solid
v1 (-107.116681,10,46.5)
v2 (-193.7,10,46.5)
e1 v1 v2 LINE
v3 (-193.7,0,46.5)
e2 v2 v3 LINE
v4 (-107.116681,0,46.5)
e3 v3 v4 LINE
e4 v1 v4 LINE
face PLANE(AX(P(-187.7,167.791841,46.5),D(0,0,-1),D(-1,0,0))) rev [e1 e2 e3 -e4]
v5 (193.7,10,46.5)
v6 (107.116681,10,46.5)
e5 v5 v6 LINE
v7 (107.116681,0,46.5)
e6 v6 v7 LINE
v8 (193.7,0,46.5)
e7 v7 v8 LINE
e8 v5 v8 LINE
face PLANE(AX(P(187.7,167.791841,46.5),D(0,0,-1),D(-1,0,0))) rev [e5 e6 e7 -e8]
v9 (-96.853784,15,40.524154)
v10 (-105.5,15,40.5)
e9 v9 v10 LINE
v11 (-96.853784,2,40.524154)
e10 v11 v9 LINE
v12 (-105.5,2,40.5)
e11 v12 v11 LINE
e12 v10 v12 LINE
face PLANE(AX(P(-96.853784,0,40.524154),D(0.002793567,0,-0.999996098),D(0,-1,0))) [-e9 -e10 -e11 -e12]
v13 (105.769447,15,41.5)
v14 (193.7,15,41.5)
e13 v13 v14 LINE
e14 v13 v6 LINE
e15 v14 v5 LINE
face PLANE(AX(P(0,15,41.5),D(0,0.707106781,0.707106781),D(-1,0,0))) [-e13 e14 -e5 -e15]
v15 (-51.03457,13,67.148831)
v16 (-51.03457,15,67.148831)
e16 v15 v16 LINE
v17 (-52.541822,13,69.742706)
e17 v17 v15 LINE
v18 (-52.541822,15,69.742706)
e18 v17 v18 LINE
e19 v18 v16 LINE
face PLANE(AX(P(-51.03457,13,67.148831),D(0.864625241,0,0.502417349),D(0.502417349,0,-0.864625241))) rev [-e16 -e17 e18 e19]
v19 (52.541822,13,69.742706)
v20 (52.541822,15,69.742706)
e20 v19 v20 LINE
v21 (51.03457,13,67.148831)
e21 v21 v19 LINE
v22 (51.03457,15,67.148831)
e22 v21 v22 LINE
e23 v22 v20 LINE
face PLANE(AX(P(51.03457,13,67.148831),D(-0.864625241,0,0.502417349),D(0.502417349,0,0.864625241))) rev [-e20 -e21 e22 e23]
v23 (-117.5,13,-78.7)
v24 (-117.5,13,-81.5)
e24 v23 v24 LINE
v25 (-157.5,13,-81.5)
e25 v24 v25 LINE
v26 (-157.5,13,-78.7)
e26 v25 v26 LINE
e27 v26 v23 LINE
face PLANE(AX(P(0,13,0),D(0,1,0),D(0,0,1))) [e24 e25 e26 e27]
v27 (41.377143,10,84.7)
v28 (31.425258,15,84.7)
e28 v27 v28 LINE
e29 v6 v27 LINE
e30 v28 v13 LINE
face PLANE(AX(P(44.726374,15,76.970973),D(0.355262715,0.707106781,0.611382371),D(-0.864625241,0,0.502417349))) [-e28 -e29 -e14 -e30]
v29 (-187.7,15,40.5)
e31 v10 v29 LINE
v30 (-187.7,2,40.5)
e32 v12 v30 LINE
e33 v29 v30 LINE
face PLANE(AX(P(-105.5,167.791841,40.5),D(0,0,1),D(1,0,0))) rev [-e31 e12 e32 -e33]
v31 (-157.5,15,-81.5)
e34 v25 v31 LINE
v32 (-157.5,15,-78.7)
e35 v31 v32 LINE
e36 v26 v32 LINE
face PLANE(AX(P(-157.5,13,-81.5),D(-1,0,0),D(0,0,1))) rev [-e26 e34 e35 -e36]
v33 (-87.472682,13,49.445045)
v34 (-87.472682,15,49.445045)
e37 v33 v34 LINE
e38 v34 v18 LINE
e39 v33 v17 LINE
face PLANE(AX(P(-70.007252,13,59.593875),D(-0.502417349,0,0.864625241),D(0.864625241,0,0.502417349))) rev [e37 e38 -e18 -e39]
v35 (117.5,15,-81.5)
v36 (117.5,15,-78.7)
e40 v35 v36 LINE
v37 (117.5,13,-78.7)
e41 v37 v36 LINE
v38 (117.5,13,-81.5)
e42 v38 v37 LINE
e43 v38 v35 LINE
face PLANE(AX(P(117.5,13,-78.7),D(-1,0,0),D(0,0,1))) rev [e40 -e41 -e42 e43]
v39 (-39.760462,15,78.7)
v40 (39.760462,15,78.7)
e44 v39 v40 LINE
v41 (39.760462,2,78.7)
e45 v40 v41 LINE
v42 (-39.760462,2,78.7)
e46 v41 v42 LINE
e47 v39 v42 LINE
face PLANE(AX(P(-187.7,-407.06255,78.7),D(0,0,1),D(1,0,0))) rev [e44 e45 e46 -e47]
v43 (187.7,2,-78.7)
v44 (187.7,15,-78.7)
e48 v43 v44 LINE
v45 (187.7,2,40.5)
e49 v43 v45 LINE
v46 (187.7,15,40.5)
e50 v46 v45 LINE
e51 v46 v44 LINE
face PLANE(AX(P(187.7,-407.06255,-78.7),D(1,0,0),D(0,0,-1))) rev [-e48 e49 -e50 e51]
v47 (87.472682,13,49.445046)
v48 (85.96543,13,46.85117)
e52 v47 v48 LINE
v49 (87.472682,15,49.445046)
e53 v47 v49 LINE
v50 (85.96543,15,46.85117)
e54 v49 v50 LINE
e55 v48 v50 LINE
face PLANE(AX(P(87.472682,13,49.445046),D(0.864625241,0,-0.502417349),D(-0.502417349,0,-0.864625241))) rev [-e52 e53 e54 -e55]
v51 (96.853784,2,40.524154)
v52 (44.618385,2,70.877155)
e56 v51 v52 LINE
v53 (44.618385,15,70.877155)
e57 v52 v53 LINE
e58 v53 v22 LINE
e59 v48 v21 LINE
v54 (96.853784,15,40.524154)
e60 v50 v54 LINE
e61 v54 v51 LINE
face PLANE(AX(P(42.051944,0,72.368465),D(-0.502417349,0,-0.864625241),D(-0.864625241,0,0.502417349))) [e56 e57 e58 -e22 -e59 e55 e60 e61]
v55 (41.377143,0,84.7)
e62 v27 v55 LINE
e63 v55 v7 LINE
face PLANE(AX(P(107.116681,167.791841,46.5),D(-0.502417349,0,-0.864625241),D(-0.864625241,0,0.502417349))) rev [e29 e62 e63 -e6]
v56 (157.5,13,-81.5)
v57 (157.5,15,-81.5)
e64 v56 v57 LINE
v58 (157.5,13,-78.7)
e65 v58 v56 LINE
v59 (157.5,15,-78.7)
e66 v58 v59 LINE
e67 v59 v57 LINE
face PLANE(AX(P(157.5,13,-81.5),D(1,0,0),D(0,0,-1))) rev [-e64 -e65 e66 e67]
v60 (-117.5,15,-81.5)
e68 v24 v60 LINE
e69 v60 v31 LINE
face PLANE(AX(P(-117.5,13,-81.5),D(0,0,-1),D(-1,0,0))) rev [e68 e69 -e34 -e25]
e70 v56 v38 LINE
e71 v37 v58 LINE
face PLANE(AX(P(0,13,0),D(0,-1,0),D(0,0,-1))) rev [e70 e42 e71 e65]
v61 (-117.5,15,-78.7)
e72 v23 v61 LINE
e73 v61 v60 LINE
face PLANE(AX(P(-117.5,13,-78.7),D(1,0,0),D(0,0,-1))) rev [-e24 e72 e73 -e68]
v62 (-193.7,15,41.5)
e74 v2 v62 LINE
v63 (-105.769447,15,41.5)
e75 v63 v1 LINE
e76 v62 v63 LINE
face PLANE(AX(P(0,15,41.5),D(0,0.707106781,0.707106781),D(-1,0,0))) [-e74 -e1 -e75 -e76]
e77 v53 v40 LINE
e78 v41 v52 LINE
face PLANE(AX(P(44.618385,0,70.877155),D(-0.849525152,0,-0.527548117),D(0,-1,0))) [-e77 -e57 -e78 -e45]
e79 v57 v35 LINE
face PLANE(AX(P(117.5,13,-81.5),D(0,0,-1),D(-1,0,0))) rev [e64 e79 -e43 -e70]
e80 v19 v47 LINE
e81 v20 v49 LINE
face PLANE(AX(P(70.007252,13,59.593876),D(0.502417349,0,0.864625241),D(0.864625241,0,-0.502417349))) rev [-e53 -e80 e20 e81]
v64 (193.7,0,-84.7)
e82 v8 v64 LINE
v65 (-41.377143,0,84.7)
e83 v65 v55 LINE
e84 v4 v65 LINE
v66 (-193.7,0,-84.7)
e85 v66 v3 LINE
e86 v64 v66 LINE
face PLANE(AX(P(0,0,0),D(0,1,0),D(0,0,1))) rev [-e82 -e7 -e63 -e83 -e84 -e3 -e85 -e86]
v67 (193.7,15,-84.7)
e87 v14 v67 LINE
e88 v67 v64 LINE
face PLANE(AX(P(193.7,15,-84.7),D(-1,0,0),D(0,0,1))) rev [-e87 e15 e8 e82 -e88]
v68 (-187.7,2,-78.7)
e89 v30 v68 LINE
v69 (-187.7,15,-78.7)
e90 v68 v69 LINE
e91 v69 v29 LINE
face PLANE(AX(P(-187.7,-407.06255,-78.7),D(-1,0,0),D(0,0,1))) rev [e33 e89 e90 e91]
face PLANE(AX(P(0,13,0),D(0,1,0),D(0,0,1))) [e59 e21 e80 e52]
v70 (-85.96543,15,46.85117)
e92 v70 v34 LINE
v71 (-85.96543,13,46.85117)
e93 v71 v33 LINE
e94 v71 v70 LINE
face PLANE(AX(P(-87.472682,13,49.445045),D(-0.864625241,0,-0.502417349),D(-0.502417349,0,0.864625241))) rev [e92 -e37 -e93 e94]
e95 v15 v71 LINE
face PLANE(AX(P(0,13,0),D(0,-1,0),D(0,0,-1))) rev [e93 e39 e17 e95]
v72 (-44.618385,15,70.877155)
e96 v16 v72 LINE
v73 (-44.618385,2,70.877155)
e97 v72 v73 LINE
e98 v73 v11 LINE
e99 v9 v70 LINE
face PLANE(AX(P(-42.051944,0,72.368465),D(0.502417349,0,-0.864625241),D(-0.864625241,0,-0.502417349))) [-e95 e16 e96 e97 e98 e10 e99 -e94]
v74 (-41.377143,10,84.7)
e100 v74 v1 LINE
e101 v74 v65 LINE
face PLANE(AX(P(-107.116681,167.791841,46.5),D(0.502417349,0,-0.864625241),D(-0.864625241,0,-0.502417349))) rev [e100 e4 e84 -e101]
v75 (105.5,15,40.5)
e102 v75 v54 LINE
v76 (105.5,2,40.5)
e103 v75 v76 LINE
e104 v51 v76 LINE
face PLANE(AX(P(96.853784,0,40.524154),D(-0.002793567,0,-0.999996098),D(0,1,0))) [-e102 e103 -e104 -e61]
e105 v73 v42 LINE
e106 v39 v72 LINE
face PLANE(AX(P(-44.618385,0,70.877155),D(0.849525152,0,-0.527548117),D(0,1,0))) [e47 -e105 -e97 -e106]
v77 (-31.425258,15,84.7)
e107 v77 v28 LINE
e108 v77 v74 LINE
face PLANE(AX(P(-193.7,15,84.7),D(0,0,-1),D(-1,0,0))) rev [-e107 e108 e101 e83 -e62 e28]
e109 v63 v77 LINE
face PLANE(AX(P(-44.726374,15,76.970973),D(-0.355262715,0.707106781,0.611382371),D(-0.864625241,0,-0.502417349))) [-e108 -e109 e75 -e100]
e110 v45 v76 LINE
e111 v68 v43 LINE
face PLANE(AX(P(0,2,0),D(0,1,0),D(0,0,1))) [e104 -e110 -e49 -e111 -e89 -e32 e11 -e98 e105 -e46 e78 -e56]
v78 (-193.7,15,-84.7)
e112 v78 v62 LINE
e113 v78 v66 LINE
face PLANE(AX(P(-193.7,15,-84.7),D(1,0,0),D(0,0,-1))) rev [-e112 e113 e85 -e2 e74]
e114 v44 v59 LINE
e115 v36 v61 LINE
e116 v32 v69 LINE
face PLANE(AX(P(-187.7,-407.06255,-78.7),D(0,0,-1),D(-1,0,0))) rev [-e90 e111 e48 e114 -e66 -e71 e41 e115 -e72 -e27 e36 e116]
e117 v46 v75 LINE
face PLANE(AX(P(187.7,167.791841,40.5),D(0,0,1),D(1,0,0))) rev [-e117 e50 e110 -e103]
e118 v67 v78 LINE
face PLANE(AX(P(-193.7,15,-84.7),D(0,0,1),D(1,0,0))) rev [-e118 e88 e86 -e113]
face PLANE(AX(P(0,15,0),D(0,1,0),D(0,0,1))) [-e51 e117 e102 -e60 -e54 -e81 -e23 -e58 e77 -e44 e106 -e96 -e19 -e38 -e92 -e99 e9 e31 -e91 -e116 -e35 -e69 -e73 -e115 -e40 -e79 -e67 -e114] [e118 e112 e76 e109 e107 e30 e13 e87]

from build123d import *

# Parameters (mm, degrees)
SKETCH1_W           = 387.4
SKETCH1_H           = 169.4
BOSS_EXTRUDE1_DEPTH = 15
SKETCH2_W           = 375.4
SKETCH2_H           = 157.4
CUT_EXTRUDE1_DEPTH  = 13
SKETCH3_W           = 40
SKETCH3_H           = 2.8
CUT_EXTRUDE2_DEPTH  = 2
BOSS_EXTRUDE2_DEPTH = 13
CUT_EXTRUDE3_DEPTH  = 212.940510521
CHAMFER1_SIZE       = 5
SKETCH7_W           = 76.032406234
SKETCH7_H           = 13
BOSS_EXTRUDE3_DEPTH = 4.323125
CHAMFER3_SIZE2      = 8.130615601
CHAMFER3_SIZE       = 4.323125
CHAMFER4_SIZE2      = 4.323125
CHAMFER4_SIZE       = 7.487872147
SKETCH8_W           = 76.032406234
SKETCH8_H           = 13
BOSS_EXTRUDE4_DEPTH = 4.323125
CHAMFER5_SIZE2      = 8.130615601
CHAMFER5_SIZE       = 4.323125
CHAMFER6_SIZE2      = 4.323125
CHAMFER6_SIZE       = 7.487872147
CUT_EXTRUDE4_DEPTH  = 2


with BuildPart() as part:
    # Sketch1 → Boss-Extrude1 (new body)
    with BuildSketch(Plane(origin=(0, 0, 0), x_dir=(1, 0, 0), z_dir=(0, 1, 0))):
        Rectangle(SKETCH1_W, SKETCH1_H)
    extrude(amount=BOSS_EXTRUDE1_DEPTH)

    # Sketch2 → Cut-Extrude1 (cut)
    with BuildSketch(Plane(origin=(0, 15, 0), x_dir=(1, 0, 0), z_dir=(0, 1, 0))):
        Rectangle(SKETCH2_W, SKETCH2_H)
    extrude(amount=-CUT_EXTRUDE1_DEPTH, mode=Mode.SUBTRACT)

    # Sketch3 → Cut-Extrude2 (cut)
    with BuildSketch(Plane(origin=(0, 15, 0), x_dir=(1, 0, 0), z_dir=(0, 1, 0))):
        with Locations((137.5, 80.1)):
            Rectangle(SKETCH3_W, SKETCH3_H)
        with Locations((-137.5, 80.1)):
            Rectangle(SKETCH3_W, SKETCH3_H)
    extrude(amount=-CUT_EXTRUDE2_DEPTH, mode=Mode.SUBTRACT)

    # Sketch4 → Boss-Extrude2 (add)
    with BuildSketch(Plane(origin=(0, 2, 0), x_dir=(1, 0, 0), z_dir=(0, 1, 0))):
        Polygon((187.7, -40.5), (105.5, -40.5), (39.760462446, -78.7), (51.702725205, -78.7), (107.116680945, -46.5), (187.7, -46.5), align=None)
        Polygon((-187.7, -46.5), (-107.116680945, -46.5), (-51.702725205, -78.7), (-39.760462446, -78.7), (-105.5, -40.5), (-187.7, -40.5), align=None)
    extrude(amount=BOSS_EXTRUDE2_DEPTH)

    # Sketch5 → Cut-Extrude3 (cut, through all)
    with BuildSketch(Plane.XZ):
        Polygon((107.116680945, 46.5), (193.7, 46.5), (193.7, 84.7), (41.377143391, 84.7), (51.702725205, 78.7), align=None)
        Polygon((-193.7, 84.7), (-193.7, 46.5), (-107.116680945, 46.5), (-51.702725205, 78.7), (-41.377143391, 84.7), align=None)
    extrude(amount=-CUT_EXTRUDE3_DEPTH, mode=Mode.SUBTRACT)

    # Chamfer1
    chamfer1_edges = [part.edges().sort_by_distance(p)[0] for p in [
        (150.408340472, 15, 46.5),
        (74.246912168, 15, 65.6),
        (-150.408340472, 15, 46.5),
        (-74.246912168, 15, 65.6),
    ]]
    chamfer(chamfer1_edges, length=CHAMFER1_SIZE)

    # Sketch7 → Boss-Extrude3 (add)
    with BuildSketch(Plane(origin=(-44.223957073, 0, 76.106347822), x_dir=(-0.8646252408638723, 0, -0.5024173492835322), z_dir=(0.5024173492835322, 0, -0.8646252408638723))):
        with Locations((32.853857148, 8.5)):
            Rectangle(SKETCH7_W, SKETCH7_H)
    extrude(amount=BOSS_EXTRUDE3_DEPTH)

    # Chamfer3
    chamfer3_edges = [part.edges().sort_by_distance(p)[0] for p in [
        (-37.588449443, 8.5, 74.962117006),
    ]]
    chamfer3_side = [part.faces().sort_by_distance(p)[0] for p in [
        (-37.631889703, 8.5, 75.036874665),
    ]]
    chamfer(chamfer3_edges, length=CHAMFER3_SIZE - 0.0001, length2=CHAMFER3_SIZE2 - 0.0001, reference=chamfer3_side[0])  # a hair under: the kernel refuses the full size

    # Chamfer4
    chamfer4_edges = [part.edges().sort_by_distance(p)[0] for p in [
        (-103.327986997, 8.5, 36.762117006),
    ]]
    chamfer4_side = [part.faces().sort_by_distance(p)[0] for p in [
        (-103.253229337, 8.5, 36.805557266),
    ]]
    chamfer(chamfer4_edges, length=CHAMFER4_SIZE - 0.0001, length2=CHAMFER4_SIZE2 - 0.0001, reference=chamfer4_side[0])  # a hair under: the kernel refuses the full size

    # Sketch8 → Boss-Extrude4 (add)
    with BuildSketch(Plane(origin=(44.223957073, 0, 76.106347822), x_dir=(-0.8646252408638638, 0, 0.5024173492835469), z_dir=(-0.5024173492835469, 0, -0.8646252408638639))):
        with Locations((-32.853857148, 8.5)):
            Rectangle(SKETCH8_W, SKETCH8_H)
    extrude(amount=BOSS_EXTRUDE4_DEPTH)

    # Chamfer5
    chamfer5_edges = [part.edges().sort_by_distance(p)[0] for p in [
        (37.588449443, 8.5, 74.962117006),
    ]]
    chamfer5_side = [part.faces().sort_by_distance(p)[0] for p in [
        (37.631889703, 8.5, 75.036874665),
    ]]
    chamfer(chamfer5_edges, length=CHAMFER5_SIZE - 0.0001, length2=CHAMFER5_SIZE2 - 0.0001, reference=chamfer5_side[0])  # a hair under: the kernel refuses the full size

    # Chamfer6
    chamfer6_edges = [part.edges().sort_by_distance(p)[0] for p in [
        (103.327986997, 8.5, 36.762117006),
    ]]
    chamfer6_side = [part.faces().sort_by_distance(p)[0] for p in [
        (103.253229337, 8.5, 36.805557266),
    ]]
    chamfer(chamfer6_edges, length=CHAMFER6_SIZE - 0.0001, length2=CHAMFER6_SIZE2 - 0.0001, reference=chamfer6_side[0])  # a hair under: the kernel refuses the full size

    # Sketch9 → Cut-Extrude4 (cut)
    with BuildSketch(Plane(origin=(0, 15, 0), x_dir=(1, 0, 0), z_dir=(0, 1, 0))):
        Polygon((70.007252271, -59.593876001), (87.472682136, -49.445045546), (85.965430137, -46.851169906), (51.034570406, -67.148830817), (52.541822405, -69.742706457), align=None)
        Polygon((-70.007251916, -59.593875391), (-87.472681782, -49.445044935), (-85.965430137, -46.851169906), (-51.034570406, -67.148830817), (-52.541822051, -69.742705846), align=None)
    extrude(amount=-CUT_EXTRUDE4_DEPTH, mode=Mode.SUBTRACT)


solid = part.part
